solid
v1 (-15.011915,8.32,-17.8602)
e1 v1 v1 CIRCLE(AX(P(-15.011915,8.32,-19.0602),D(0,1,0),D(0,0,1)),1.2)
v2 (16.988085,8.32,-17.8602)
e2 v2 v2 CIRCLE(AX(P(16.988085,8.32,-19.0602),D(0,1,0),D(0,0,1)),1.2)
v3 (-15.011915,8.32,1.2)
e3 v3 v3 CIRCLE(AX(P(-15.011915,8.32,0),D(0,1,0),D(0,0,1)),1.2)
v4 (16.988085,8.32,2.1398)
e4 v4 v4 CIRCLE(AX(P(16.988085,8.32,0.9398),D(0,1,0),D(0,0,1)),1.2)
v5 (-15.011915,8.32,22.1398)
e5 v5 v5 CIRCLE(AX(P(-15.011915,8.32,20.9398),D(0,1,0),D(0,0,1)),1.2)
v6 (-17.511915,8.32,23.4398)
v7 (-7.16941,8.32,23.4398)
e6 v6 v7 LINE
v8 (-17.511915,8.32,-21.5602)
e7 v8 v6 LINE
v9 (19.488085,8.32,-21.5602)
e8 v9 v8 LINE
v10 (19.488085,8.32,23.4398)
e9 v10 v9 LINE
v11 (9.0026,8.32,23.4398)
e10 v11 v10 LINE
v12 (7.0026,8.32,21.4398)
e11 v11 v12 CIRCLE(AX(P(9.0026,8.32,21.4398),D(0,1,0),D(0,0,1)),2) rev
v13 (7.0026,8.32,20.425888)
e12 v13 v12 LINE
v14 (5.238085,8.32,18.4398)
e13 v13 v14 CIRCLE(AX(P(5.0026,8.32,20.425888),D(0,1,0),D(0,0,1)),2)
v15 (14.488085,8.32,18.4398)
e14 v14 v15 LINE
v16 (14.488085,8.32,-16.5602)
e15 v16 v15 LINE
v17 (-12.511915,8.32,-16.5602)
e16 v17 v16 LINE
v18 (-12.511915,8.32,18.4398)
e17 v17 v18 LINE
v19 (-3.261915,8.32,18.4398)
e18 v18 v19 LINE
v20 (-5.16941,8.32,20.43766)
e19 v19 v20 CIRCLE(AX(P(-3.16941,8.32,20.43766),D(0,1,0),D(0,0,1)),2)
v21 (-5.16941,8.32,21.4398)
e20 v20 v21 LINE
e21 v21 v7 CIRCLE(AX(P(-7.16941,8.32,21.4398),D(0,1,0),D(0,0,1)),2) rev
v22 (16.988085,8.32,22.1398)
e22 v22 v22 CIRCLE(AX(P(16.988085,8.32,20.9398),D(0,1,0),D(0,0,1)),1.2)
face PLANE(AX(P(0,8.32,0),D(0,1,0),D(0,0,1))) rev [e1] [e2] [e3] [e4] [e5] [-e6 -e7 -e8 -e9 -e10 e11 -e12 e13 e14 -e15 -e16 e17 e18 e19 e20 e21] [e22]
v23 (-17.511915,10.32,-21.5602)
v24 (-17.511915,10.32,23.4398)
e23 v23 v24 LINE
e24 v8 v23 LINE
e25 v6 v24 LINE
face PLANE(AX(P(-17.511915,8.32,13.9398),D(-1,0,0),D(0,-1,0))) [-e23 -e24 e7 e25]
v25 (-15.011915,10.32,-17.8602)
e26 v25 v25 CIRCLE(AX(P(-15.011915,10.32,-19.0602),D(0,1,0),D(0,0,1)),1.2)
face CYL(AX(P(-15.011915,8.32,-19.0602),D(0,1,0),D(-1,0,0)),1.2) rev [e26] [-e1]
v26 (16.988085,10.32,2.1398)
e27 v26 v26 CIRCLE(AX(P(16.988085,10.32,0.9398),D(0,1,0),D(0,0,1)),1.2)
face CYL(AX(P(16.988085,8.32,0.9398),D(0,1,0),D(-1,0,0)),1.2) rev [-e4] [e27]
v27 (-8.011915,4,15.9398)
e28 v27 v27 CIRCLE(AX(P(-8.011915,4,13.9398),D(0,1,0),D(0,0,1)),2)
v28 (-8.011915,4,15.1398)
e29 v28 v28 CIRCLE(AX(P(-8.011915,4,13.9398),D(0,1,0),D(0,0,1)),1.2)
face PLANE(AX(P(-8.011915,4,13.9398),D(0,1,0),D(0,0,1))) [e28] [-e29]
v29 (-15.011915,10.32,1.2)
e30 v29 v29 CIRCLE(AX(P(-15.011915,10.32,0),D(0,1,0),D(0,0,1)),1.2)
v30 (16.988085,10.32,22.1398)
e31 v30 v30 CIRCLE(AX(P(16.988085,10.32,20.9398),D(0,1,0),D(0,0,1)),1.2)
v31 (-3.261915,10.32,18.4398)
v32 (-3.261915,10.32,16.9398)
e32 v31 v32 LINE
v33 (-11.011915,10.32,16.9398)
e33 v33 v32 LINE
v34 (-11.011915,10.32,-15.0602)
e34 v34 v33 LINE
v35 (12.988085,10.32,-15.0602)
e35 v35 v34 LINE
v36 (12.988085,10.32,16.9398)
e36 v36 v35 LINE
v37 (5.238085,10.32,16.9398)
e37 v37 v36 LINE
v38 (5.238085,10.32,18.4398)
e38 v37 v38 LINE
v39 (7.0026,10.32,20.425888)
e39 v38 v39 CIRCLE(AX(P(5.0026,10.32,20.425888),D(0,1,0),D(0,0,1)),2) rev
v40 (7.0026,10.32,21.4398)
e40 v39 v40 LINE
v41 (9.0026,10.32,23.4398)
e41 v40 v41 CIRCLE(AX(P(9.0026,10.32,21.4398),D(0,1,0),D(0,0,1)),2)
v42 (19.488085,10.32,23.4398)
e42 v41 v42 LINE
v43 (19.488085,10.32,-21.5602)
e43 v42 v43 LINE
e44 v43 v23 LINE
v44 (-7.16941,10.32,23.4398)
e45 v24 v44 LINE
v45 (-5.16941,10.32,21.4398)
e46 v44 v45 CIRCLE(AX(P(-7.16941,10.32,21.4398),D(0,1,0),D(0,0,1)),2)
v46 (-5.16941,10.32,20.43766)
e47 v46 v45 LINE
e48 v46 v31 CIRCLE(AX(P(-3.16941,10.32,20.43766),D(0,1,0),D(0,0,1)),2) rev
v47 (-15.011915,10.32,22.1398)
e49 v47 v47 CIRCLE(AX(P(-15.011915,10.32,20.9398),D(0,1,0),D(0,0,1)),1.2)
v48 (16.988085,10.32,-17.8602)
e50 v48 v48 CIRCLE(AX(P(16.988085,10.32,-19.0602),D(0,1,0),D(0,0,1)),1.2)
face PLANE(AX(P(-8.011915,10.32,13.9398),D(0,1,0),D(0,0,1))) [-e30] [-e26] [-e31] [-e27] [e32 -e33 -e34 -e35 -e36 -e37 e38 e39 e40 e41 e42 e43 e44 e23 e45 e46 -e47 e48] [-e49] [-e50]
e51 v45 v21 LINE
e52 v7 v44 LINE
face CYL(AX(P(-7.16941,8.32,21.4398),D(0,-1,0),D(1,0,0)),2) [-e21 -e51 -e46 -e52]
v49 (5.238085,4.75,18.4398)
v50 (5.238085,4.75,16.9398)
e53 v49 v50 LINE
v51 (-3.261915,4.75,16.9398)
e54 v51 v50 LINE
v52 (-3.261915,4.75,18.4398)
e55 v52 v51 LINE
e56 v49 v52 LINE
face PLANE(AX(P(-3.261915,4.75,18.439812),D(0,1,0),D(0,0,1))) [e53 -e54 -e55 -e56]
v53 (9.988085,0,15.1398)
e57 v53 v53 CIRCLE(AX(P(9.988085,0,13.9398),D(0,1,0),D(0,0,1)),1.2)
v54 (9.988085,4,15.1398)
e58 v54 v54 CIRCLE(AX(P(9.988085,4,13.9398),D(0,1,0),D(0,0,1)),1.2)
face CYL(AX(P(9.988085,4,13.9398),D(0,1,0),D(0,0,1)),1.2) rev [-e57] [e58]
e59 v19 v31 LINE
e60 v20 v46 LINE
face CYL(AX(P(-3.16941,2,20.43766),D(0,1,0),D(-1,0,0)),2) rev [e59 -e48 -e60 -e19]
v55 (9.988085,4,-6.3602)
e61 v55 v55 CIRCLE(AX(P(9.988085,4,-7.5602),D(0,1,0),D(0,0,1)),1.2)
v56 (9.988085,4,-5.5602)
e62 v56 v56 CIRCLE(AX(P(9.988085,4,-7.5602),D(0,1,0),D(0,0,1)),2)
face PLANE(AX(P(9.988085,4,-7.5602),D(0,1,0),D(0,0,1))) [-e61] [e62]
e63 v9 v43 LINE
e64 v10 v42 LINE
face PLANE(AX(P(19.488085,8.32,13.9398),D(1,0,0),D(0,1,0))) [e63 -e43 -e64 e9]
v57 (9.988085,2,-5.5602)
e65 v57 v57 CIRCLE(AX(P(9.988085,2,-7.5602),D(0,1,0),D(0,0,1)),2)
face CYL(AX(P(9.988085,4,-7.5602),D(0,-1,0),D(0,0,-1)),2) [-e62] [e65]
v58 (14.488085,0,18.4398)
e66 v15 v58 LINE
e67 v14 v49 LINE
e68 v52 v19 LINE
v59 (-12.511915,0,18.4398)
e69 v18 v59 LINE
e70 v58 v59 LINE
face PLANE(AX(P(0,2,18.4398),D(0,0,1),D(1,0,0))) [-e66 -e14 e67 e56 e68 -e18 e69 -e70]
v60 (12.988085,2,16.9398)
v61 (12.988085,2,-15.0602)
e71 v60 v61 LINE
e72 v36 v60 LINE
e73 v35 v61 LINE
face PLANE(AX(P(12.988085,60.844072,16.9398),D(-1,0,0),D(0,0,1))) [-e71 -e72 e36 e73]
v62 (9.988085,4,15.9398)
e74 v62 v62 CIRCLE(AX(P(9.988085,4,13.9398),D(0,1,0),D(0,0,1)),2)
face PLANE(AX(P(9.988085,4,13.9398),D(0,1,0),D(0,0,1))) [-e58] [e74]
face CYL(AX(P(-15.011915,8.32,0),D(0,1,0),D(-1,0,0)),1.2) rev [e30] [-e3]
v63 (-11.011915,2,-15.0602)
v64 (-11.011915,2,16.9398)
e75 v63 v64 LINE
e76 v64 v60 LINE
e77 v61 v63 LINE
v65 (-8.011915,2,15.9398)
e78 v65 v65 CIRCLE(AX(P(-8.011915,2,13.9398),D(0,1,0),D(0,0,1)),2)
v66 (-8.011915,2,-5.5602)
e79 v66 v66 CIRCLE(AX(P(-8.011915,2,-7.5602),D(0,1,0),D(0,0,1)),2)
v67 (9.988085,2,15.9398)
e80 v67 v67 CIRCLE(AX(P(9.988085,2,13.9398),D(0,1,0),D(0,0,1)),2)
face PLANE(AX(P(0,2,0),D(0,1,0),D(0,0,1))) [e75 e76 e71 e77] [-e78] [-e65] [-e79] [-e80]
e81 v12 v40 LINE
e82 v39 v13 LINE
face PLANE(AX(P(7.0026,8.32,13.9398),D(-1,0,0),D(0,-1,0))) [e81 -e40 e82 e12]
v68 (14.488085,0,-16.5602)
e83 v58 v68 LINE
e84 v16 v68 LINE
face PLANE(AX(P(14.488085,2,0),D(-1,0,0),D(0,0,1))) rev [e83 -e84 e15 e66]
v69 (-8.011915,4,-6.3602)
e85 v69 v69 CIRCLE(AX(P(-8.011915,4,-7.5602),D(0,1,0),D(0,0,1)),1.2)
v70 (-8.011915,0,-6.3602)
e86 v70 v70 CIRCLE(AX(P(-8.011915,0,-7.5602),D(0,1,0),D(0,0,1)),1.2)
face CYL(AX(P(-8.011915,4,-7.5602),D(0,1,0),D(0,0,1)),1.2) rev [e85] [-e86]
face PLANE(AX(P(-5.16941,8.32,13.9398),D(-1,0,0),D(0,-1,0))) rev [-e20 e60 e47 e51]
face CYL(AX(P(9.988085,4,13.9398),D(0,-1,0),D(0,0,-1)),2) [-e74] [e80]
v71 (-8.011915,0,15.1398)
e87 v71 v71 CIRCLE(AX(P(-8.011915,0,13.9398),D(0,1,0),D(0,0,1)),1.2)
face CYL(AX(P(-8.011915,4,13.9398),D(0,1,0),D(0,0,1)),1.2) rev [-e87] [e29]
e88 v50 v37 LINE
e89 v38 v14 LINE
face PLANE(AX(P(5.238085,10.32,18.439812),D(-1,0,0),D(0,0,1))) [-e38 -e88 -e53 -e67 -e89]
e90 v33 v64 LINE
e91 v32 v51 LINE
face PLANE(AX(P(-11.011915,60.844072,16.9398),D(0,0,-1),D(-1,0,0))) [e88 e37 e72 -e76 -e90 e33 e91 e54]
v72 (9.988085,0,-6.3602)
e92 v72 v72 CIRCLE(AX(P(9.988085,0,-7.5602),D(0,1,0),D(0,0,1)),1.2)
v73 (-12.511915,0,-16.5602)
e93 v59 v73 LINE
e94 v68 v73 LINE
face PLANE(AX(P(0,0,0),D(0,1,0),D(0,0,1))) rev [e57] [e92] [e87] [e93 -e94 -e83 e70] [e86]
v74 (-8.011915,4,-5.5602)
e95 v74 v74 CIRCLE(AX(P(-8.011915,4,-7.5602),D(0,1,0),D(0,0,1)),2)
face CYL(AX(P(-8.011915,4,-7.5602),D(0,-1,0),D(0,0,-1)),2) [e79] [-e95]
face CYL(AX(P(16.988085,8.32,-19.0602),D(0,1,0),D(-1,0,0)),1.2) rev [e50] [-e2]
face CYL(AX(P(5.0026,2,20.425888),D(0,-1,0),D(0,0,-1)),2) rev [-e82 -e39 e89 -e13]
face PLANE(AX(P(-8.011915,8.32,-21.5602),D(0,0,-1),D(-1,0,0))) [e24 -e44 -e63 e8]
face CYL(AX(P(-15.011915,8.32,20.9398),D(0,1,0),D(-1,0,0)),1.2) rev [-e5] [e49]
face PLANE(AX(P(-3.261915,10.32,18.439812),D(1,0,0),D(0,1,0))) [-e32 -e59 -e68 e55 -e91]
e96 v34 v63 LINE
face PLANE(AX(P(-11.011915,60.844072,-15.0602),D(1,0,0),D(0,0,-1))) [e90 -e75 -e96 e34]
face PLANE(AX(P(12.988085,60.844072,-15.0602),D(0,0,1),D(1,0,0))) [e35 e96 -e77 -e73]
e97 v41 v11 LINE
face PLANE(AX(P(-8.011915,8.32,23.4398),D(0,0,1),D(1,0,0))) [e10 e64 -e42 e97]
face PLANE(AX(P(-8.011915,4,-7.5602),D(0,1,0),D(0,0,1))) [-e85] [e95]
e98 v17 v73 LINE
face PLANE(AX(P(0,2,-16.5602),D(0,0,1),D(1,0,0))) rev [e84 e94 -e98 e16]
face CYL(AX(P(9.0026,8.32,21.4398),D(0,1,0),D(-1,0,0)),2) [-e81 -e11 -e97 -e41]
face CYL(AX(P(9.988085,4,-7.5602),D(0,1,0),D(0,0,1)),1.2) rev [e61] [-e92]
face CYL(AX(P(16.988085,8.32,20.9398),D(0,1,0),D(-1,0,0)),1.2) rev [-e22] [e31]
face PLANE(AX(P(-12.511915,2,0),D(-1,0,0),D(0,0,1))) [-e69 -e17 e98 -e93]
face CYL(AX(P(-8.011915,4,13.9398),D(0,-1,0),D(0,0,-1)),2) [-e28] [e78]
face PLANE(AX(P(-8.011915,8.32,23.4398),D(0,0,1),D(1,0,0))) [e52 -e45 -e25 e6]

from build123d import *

# Parameters (mm, degrees)
SKETCH1_W                      = 27
SKETCH1_H                      = 35
SKETCH1_R                      = 1.113712744
SKETCH1_R_2                    = 1.000106258
SKETCH1_R_3                    = 1.174626552
SKETCH1_R_4                    = 1.19920455
SKETCH1_W_2                    = 8.5
SKETCH1_H_2                    = 2.12
BOSS_EXTRUDE1_DEPTH            = 2
SKETCH3_R                      = 2
BOSS_EXTRUDE2_DEPTH            = 2
M2_CLEARANCE_HOLE1_D           = 2.4
LPATTERN1_COUNT                = 2
LPATTERN1_PITCH                = 18
LPATTERN1_COUNT_DIR2           = 2
LPATTERN1_PITCH_DIR2           = 21.5
SKETCH6_W                      = 27
SKETCH6_H                      = 35
SKETCH6_W_2                    = 24
SKETCH6_H_2                    = 32
BOSS_EXTRUDE4_DEPTH            = 8.32
CUT_EXTRUDE1_REACH             = 41.261
SKETCH7_W                      = 8.5
SKETCH7_H                      = 5.57
CUT_EXTRUDE1_DIRECTION_2_DEPTH = 40.260756636
BOSS_EXTRUDE5_START            = -4
BOSS_EXTRUDE5_OUTLINE_R        = 1.2
BOSS_EXTRUDE5_DEPTH            = 2
M2_CLEARANCE_HOLE2_D           = 2.4
FILLET1_R                      = 2


with BuildPart() as part:
    # Sketch1 → Boss-Extrude1 (new body)
    # profile 1 of 8: a face of its own
    with BuildSketch(Plane(origin=(0, 0, 0), x_dir=(1, 0, 0), z_dir=(0, 1, 0))):
        with Locations((0.988085162, -0.939800033)):
            Rectangle(SKETCH1_W, SKETCH1_H)
        Polygon((-10.011914838, -15.939800033), (-10.011914838, 14.060199967), (11.988085162, 14.060199967), (11.988085162, -15.939800033), (5.238085162, -15.939800033), (5.238085162, -18.059800033), (-3.261914838, -18.059800033), (-3.261914838, -15.939800033), align=None, mode=Mode.SUBTRACT)
    # profile 2 of 8: a face of its own
    with BuildSketch(Plane(origin=(0, 0, 0), x_dir=(1, 0, 0), z_dir=(0, 1, 0))):
        Polygon((11.988085162, 14.060199967), (-10.011914838, 14.060199967), (-10.011914838, -15.939800033), (-3.261914838, -15.939800033), (-3.261914838, -13.819800033), (5.238085162, -13.819800033), (5.238085162, -15.939800033), (11.988085162, -15.939800033), align=None)
        with Locations((-8.011914838, -13.939800033)):
            Circle(SKETCH1_R, mode=Mode.SUBTRACT)
        with Locations((7.931487186, -14.291814947)):
            Circle(SKETCH1_R_2, mode=Mode.SUBTRACT)
        with Locations((-8.011914838, 7.560199967)):
            Circle(SKETCH1_R_3, mode=Mode.SUBTRACT)
        with Locations((9.988085162, 7.560199967)):
            Circle(SKETCH1_R_4, mode=Mode.SUBTRACT)
    # profile 3 of 8: a face of its own
    with BuildSketch(Plane(origin=(0, 0, 0), x_dir=(1, 0, 0), z_dir=(0, 1, 0))):
        with Locations((-8.011914838, 7.560199967)):
            Circle(SKETCH1_R_3)
    # profile 4 of 8: a face of its own
    with BuildSketch(Plane(origin=(0, 0, 0), x_dir=(1, 0, 0), z_dir=(0, 1, 0))):
        with Locations((9.988085162, 7.560199967)):
            Circle(SKETCH1_R_4)
    # profile 5 of 8: a face of its own
    with BuildSketch(Plane(origin=(0, 0, 0), x_dir=(1, 0, 0), z_dir=(0, 1, 0))):
        with Locations((7.931487186, -14.291814947)):
            Circle(SKETCH1_R_2)
    # profile 6 of 8: a face of its own
    with BuildSketch(Plane(origin=(0, 0, 0), x_dir=(1, 0, 0), z_dir=(0, 1, 0))):
        with Locations((0.988085162, -16.999800033)):
            Rectangle(SKETCH1_W_2, SKETCH1_H_2)
    # profile 7 of 8: a face of its own
    with BuildSketch(Plane(origin=(0, 0, 0), x_dir=(1, 0, 0), z_dir=(0, 1, 0))):
        with Locations((0.988085162, -14.879800033)):
            Rectangle(SKETCH1_W_2, SKETCH1_H_2)
    # profile 8 of 8: a face of its own
    with BuildSketch(Plane(origin=(0, 0, 0), x_dir=(1, 0, 0), z_dir=(0, 1, 0))):
        with Locations((-8.011914838, -13.939800033)):
            Circle(SKETCH1_R)
    extrude(amount=BOSS_EXTRUDE1_DEPTH)

    # Sketch3 → Boss-Extrude2 (add)
    with BuildSketch(Plane(origin=(0, 2, 0), x_dir=(1, 0, 0), z_dir=(0, 1, 0))):
        with Locations(Location((-8.011914838, 7.560199967, 0), (0, 0, 270))):
            Circle(SKETCH3_R)
    boss_extrude2 = extrude(amount=BOSS_EXTRUDE2_DEPTH)

    # M2 Clearance Hole1 (through all)
    with Locations(Plane(origin=(0, 4, 0), x_dir=(1, 0, 0), z_dir=(0, 1, 0))):
        with Locations((-8.011914838, 7.560199967)):
            m2_clearance_hole1 = Hole(M2_CLEARANCE_HOLE1_D / 2)

    # LPattern1: Boss-Extrude2, M2 Clearance Hole1 2 × 2
    with Locations(*[(i * LPATTERN1_PITCH, 0, j * LPATTERN1_PITCH_DIR2) for i in range(LPATTERN1_COUNT) for j in range(LPATTERN1_COUNT_DIR2) if (i, j) != (0, 0)]):
        add(boss_extrude2)
        add(m2_clearance_hole1, mode=Mode.SUBTRACT)

    # Sketch6 → Boss-Extrude4 (add)
    with BuildSketch(Plane(origin=(0, 2, 0), x_dir=(1, 0, 0), z_dir=(0, 1, 0))):
        with Locations((0.988085162, -0.939800033)):
            Rectangle(SKETCH6_W, SKETCH6_H)
        with Locations((0.988085162, -0.939800033)):
            Rectangle(SKETCH6_W_2, SKETCH6_H_2, mode=Mode.SUBTRACT)
    extrude(amount=BOSS_EXTRUDE4_DEPTH)

    # Sketch7 → Cut-Extrude1 (cut, up to next)
    with BuildSketch(Plane.XY.offset(18.439800033), mode=Mode.PRIVATE) as cut_extrude1_sk1:
        with Locations((0.988085162, 7.535)):
            Rectangle(SKETCH7_W, SKETCH7_H)
    cut_extrude1_tool1 = extrude(cut_extrude1_sk1.sketch, amount=-CUT_EXTRUDE1_REACH, mode=Mode.PRIVATE) & part.part
    add(cut_extrude1_tool1.solids().sort_by_distance((0.988085, 7.535, 18.4398))[0], mode=Mode.SUBTRACT)

    # Sketch7 → Cut-Extrude1 direction 2 (cut)
    with BuildSketch(Plane.XY.offset(18.439800033)):
        with Locations((0.988085162, 7.535)):
            Rectangle(SKETCH7_W, SKETCH7_H)
    extrude(amount=CUT_EXTRUDE1_DIRECTION_2_DEPTH, mode=Mode.SUBTRACT)

    # Boss-Extrude5: read off the stored shape, not the designer's step
    # Boss-Extrude5 outline → Boss-Extrude5 (add)
    with BuildSketch(Plane(origin=(0, 12.32, 0), x_dir=(1, 0, 0), z_dir=(0, 1, 0)).offset(BOSS_EXTRUDE5_START)):
        Polygon((-5.169409796, -23.439799853), (-5.169409796, -18.439799853), (-12.511914838, -18.439800033), (-12.511914838, 16.560199967), (14.488085162, 16.560199967), (14.488085162, -18.439800033), (7.002600417, -18.439800033), (7.002600417, -23.439799853), (19.488084722, -23.439799853), (19.488084722, 21.560200147), (-17.511915278, 21.560200147), (-17.511915278, -23.439799853), align=None)
        with Locations((-15.011915278, -20.939799853)):
            Circle(BOSS_EXTRUDE5_OUTLINE_R, mode=Mode.SUBTRACT)
        with Locations((16.988084722, -20.939799853)):
            Circle(BOSS_EXTRUDE5_OUTLINE_R, mode=Mode.SUBTRACT)
        with Locations((-15.011915278, 0)):
            Circle(BOSS_EXTRUDE5_OUTLINE_R, mode=Mode.SUBTRACT)
        with Locations((-15.011915278, 19.060200147)):
            Circle(BOSS_EXTRUDE5_OUTLINE_R, mode=Mode.SUBTRACT)
        with Locations((16.988084722, -0.939799853)):
            Circle(BOSS_EXTRUDE5_OUTLINE_R, mode=Mode.SUBTRACT)
        with Locations((16.988084722, 19.060200147)):
            Circle(BOSS_EXTRUDE5_OUTLINE_R, mode=Mode.SUBTRACT)
    extrude(amount=BOSS_EXTRUDE5_DEPTH)

    # M2 Clearance Hole2 (through all)
    with Locations(Plane(origin=(0, 10.32, 0), x_dir=(1, 0, 0), z_dir=(0, 1, 0))):
        with Locations((-15.011915278, 19.060200147), (-15.011915278, 0), (-15.011915278, -20.939799853), (16.988084722, -20.939799853), (16.988084722, -0.939799853), (16.988084722, 19.060200147)):
            Hole(M2_CLEARANCE_HOLE2_D / 2)

    # Fillet1
    # the kernel refuses this fillet: 2 mm, written as the material it adds along each edge
    with BuildSketch(Plane(origin=(7.002600417, 8.32, 18.439800033), x_dir=(0, 0, 1), z_dir=(0, 1, 0))) as fillet1_piece_1:
        with BuildLine():
            CenterArc((1.98608835, -2), FILLET1_R, 90, 83.23817367)
            Line((0, -1.764515255), (-0.039721767, -1.75980556))
            ThreePointArc((-0.039721767, -1.75980556), (-0.04, -0.882257627), (-0.04, 0))
            Line((-0.04, 0), (0, 0.04))
            Line((0, 0.04), (1.98608835, 0.04))
            Line((1.98608835, 0.04), (1.98608835, 0))
        make_face()
    extrude(amount=2)
    # the kernel refuses this fillet: 2 mm, written as the material it adds along each edge
    with BuildSketch(Plane(origin=(-5.169409796, 8.32, 18.439799853), x_dir=(0, 0, 1), z_dir=(0, 1, 0))) as fillet1_2_piece_1:
        with BuildLine():
            CenterArc((1.997859739, 2), FILLET1_R, 182.651020031, 87.348979969)
            Line((1.8e-07, 1.907494958), (-0.039957011, 1.905644857))
            ThreePointArc((-0.039957011, 1.905644857), (-0.03999982, 0.953747479), (-0.04, 0))
            Line((-0.04, 0), (0, -0.04))
            Line((0, -0.04), (1.997859739, -0.04))
            Line((1.997859739, -0.04), (1.997859739, 0))
        make_face()
    extrude(amount=2)
    # the kernel refuses this fillet: 2 mm, written as the material it takes off along each edge
    with BuildSketch(Plane(origin=(-5.169409796, 3.32, 23.439799853), x_dir=(0, 0, -1), z_dir=(0, 1, 0))) as fillet1_3_piece_1:
        with BuildLine():
            CenterArc((FILLET1_R, FILLET1_R), FILLET1_R, 180, 90)
            Line((0, FILLET1_R), (-FILLET1_R * 0.02, FILLET1_R))
            Line((-FILLET1_R * 0.02, FILLET1_R), (-FILLET1_R * 0.02, -FILLET1_R * 0.02))
            Line((-FILLET1_R * 0.02, -FILLET1_R * 0.02), (FILLET1_R, -FILLET1_R * 0.02))
            Line((FILLET1_R, -FILLET1_R * 0.02), (FILLET1_R, 0))
        make_face()
    extrude(amount=12, mode=Mode.SUBTRACT)
    # the kernel refuses this fillet: 2 mm, written as the material it takes off along each edge
    with BuildSketch(Plane(origin=(7.002600417, 3.32, 23.439799853), x_dir=(1, 0, 0), z_dir=(0, 1, 0))) as fillet1_4_piece_1:
        with BuildLine():
            CenterArc((FILLET1_R, FILLET1_R), FILLET1_R, 180, 90)
            Line((0, FILLET1_R), (-FILLET1_R * 0.02, FILLET1_R))
            Line((-FILLET1_R * 0.02, FILLET1_R), (-FILLET1_R * 0.02, -FILLET1_R * 0.02))
            Line((-FILLET1_R * 0.02, -FILLET1_R * 0.02), (FILLET1_R, -FILLET1_R * 0.02))
            Line((FILLET1_R, -FILLET1_R * 0.02), (FILLET1_R, 0))
        make_face()
    extrude(amount=12, mode=Mode.SUBTRACT)


solid = part.part
